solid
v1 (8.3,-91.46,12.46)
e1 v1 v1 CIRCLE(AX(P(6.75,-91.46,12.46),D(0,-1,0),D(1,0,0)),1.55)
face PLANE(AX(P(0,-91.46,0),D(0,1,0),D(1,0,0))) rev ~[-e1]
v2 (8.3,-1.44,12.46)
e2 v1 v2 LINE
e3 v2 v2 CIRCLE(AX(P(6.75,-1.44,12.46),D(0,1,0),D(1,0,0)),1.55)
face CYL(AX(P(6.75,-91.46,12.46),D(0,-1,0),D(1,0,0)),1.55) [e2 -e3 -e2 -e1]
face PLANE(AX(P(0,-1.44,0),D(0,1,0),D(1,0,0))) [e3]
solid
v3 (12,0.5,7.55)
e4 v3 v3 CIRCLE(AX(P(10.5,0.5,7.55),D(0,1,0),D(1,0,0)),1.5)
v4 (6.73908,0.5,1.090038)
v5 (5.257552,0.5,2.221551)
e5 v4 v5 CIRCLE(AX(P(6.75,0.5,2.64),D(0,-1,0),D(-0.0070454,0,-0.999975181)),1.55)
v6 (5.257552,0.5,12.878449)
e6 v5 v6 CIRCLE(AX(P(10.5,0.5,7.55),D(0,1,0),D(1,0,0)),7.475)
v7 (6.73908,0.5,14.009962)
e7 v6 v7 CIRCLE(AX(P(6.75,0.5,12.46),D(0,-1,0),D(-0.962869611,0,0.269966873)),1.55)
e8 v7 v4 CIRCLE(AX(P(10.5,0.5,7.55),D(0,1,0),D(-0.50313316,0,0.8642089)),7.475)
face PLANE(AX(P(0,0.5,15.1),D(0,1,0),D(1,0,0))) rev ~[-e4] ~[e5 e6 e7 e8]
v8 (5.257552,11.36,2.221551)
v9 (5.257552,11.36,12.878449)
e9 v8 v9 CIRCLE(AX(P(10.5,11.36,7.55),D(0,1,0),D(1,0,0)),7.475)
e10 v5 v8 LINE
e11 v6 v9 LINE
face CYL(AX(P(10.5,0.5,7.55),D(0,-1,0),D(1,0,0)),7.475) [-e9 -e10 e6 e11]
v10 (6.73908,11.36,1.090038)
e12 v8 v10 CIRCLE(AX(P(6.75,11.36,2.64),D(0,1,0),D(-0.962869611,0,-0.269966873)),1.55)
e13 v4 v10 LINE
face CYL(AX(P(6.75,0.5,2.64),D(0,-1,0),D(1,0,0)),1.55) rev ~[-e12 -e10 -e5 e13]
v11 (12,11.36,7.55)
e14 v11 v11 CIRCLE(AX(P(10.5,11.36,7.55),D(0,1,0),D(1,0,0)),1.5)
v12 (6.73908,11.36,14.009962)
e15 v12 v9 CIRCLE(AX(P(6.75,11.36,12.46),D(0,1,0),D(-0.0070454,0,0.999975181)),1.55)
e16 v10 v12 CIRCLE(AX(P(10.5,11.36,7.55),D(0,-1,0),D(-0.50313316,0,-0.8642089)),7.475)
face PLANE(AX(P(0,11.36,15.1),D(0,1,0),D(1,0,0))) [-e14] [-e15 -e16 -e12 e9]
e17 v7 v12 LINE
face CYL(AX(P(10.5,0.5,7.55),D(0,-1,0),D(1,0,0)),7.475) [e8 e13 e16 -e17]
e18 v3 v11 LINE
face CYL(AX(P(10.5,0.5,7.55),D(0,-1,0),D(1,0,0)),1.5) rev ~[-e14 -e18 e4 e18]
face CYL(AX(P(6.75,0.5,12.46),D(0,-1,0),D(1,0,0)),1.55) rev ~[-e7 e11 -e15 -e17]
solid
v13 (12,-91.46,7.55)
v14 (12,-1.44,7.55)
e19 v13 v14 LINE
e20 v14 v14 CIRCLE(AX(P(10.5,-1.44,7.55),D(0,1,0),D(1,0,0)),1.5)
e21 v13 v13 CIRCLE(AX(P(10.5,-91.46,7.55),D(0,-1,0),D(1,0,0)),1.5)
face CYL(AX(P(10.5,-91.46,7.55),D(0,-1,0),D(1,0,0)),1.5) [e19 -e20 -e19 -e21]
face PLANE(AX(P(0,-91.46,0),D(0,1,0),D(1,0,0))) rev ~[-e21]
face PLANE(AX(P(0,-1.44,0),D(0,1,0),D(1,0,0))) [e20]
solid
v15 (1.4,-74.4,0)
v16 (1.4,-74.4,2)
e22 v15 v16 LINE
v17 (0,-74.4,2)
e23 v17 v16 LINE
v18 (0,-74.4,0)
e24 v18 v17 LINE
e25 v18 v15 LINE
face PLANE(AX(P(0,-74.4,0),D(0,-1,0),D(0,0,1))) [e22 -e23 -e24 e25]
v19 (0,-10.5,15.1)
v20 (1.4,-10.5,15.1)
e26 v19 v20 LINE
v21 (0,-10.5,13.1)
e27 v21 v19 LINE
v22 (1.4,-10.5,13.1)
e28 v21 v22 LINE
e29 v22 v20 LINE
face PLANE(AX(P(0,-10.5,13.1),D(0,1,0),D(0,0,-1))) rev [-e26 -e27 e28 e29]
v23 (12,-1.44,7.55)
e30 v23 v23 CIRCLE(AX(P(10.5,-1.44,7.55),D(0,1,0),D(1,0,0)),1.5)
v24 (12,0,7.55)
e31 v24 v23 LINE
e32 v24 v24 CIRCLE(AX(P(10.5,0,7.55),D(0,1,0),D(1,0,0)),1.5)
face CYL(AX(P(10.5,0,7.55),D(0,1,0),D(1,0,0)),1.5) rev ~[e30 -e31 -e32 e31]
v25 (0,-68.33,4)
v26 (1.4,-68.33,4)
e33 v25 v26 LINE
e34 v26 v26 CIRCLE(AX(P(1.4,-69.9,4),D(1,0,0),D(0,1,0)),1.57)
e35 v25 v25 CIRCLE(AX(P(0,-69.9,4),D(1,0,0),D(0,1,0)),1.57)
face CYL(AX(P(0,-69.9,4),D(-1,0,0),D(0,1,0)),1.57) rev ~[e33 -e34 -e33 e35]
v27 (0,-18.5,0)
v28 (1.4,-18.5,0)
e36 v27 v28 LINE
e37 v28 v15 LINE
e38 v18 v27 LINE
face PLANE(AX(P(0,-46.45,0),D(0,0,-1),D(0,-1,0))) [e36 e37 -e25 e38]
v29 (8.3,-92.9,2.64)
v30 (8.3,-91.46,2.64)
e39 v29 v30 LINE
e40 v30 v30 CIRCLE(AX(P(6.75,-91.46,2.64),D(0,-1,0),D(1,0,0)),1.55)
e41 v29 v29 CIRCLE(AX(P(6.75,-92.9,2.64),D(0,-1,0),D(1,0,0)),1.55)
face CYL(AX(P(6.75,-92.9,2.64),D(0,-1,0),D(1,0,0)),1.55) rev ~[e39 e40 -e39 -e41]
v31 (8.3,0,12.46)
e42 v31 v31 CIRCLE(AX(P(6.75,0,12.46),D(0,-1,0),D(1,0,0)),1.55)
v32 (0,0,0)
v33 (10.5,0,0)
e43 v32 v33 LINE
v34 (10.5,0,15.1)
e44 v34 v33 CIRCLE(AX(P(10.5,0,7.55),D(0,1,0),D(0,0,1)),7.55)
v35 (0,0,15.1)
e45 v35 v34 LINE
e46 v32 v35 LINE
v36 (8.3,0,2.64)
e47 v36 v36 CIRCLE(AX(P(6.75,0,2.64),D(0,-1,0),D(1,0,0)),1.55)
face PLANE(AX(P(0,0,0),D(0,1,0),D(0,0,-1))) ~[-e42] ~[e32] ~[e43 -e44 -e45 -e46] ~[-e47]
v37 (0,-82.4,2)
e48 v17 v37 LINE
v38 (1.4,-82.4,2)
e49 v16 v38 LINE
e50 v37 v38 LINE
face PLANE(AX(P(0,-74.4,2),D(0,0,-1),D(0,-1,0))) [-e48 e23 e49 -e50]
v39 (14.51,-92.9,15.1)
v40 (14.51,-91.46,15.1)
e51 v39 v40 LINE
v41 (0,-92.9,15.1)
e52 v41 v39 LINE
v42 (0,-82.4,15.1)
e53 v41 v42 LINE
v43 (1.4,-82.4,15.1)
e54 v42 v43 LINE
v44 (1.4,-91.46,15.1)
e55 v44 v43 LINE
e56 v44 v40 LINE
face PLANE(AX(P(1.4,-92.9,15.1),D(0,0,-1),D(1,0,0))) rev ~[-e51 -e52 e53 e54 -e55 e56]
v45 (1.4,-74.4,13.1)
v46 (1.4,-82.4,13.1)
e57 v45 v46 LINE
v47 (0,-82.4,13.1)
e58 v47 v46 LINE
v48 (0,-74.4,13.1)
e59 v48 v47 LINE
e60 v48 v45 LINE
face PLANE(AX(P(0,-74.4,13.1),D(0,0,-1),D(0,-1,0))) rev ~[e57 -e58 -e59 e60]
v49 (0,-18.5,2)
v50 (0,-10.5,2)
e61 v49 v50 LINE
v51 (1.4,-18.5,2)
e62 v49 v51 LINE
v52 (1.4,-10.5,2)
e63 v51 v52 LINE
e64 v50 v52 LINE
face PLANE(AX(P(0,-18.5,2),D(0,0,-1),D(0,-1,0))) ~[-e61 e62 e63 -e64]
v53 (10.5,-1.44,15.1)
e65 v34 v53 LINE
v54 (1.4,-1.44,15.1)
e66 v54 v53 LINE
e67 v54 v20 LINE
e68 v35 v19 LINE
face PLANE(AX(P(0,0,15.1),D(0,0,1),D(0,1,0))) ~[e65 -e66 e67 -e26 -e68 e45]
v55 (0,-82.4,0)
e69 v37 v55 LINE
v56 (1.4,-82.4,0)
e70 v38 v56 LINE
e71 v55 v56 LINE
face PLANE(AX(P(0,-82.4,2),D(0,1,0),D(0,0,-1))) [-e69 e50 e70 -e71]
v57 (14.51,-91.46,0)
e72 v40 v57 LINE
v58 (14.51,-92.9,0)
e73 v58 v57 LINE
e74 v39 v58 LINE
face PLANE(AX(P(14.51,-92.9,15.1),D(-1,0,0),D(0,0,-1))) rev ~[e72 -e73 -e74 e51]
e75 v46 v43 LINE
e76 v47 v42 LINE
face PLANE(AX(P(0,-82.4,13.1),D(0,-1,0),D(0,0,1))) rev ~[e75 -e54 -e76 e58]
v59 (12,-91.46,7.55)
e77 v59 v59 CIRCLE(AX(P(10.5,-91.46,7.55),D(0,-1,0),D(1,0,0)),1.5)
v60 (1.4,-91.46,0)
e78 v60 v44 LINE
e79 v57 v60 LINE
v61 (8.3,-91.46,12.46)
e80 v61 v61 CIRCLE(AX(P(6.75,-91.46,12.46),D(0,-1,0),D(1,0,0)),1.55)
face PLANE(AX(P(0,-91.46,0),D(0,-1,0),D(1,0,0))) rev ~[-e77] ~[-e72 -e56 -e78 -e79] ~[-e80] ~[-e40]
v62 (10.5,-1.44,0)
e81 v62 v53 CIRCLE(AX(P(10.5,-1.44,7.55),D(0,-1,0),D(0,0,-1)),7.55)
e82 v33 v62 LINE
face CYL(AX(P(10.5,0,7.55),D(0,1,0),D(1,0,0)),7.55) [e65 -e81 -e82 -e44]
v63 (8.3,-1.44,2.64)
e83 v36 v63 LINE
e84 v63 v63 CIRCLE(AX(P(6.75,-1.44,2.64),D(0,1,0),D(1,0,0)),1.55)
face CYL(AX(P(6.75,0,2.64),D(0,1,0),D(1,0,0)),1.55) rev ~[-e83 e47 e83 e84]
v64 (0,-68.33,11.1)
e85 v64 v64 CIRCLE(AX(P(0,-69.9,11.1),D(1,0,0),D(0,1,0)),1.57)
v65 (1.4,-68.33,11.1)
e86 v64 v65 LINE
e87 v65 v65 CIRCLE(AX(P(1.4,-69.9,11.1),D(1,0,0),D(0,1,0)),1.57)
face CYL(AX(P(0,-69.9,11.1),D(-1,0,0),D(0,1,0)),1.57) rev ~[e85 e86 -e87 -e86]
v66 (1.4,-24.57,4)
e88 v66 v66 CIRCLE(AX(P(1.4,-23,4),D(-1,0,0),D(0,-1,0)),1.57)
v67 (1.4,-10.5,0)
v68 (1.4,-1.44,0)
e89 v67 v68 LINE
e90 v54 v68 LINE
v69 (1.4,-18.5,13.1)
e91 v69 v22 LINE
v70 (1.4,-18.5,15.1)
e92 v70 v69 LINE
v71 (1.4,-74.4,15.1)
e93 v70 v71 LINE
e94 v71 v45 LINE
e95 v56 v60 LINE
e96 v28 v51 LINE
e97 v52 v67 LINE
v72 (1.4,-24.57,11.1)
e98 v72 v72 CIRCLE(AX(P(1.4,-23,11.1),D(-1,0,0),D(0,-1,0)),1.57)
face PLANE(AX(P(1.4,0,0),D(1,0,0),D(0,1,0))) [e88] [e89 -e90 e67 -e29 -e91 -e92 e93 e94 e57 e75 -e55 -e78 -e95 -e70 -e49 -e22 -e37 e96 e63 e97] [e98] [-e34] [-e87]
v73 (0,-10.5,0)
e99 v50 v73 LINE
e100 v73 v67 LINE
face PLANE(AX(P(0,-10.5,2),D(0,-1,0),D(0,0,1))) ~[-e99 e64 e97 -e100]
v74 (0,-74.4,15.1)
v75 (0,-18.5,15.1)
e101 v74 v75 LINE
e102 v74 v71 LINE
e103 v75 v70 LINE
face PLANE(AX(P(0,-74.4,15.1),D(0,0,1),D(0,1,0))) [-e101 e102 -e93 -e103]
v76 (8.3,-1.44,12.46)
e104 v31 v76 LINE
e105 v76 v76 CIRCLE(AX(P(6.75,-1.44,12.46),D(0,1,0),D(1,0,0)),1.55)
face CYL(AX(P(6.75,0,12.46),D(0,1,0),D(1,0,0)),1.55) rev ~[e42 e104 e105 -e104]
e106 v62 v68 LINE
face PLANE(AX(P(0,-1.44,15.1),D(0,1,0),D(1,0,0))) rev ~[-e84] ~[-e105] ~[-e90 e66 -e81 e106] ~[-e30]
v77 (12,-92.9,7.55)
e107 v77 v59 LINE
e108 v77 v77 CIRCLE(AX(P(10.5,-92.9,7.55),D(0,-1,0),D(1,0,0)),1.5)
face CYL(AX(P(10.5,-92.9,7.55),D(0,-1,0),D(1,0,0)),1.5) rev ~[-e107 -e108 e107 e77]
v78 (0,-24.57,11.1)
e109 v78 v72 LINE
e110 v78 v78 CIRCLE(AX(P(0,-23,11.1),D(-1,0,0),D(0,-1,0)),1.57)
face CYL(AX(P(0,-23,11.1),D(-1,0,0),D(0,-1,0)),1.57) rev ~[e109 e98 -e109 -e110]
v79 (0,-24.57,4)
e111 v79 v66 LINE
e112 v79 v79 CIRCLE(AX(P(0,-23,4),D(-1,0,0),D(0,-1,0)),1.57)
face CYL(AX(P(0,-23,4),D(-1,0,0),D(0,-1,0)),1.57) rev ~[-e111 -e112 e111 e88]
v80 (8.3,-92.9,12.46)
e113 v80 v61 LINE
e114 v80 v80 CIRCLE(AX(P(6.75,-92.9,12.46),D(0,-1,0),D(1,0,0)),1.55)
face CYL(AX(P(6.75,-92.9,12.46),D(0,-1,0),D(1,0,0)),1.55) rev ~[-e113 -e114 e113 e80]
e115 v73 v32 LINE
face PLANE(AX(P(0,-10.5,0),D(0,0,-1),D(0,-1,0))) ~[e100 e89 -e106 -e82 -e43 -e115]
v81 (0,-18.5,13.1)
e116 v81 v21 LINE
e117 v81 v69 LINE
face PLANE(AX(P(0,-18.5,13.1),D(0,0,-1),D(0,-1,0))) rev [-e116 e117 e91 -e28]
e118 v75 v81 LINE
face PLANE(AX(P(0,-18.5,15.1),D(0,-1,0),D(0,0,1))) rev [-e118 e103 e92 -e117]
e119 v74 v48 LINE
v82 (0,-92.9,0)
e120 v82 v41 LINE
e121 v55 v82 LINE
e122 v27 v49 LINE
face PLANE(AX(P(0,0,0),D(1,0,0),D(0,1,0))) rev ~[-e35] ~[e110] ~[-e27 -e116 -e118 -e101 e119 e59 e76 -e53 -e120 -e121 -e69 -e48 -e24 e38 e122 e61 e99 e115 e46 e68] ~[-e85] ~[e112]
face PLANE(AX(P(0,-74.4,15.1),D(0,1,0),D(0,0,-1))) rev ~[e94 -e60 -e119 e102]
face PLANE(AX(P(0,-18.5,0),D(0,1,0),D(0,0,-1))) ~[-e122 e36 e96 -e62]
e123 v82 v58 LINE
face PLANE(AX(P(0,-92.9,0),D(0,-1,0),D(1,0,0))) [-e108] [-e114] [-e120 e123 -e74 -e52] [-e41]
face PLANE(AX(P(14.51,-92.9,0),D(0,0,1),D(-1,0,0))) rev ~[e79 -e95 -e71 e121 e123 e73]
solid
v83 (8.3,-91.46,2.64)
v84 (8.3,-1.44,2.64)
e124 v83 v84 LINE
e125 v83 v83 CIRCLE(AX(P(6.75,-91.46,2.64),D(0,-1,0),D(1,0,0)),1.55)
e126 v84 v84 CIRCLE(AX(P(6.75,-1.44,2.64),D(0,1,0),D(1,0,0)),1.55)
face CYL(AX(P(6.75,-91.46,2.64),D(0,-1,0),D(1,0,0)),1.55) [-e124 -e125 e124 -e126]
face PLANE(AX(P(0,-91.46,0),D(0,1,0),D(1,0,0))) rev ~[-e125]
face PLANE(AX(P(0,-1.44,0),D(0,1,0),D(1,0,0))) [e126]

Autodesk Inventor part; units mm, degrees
ref_plane "YZ Plane" through (0, 0, 0) normal (1, 0, 0) x (0, 1, 0)
ref_plane "XZ Plane" through (0, 0, 0) normal (0, 1, 0) x (-1, 0, 0)
ref_plane "XY Plane" through (0, 0, 0) normal (0, 0, 1) x (1, 0, 0)
sketch "Skizze1" plane through (0, 0, 0) normal (1, 0, 0) x (0, 1, 0)
  line L0 (0, 0) -> (-92.9, 0)
  line L1 (-92.9, 0) -> (-92.9, 15.1)
  line L2 (-92.9, 15.1) -> (0, 15.1)
  line L3 (0, 15.1) -> (0, 0)
  line L4 (-46.45, 15.1) -> (-46.45, 0)
  circle A0 centre (-69.9, 11.1) radius 1.57
  circle A1 centre (-69.9, 4) radius 1.57
  line L5 (-82.4, 15.1) -> (-74.4, 15.1)
  line L6 (-74.4, 15.1) -> (-74.4, 13.1)
  line L7 (-74.4, 13.1) -> (-82.4, 13.1)
  line L8 (-82.4, 13.1) -> (-82.4, 15.1)
  line L9 (-82.4, 0) -> (-74.4, 0)
  line L10 (-74.4, 0) -> (-74.4, 2)
  line L11 (-74.4, 2) -> (-82.4, 2)
  line L12 (-82.4, 2) -> (-82.4, 0)
  dimension "d0" = 92.9
  dimension "d1" = 15.1
  dimension "d2" = 3.14
  dimension "d3" = 3.14
  dimension "d4" = 23
  dimension "d5" = 23
  dimension "d6" = 4
  dimension "d7" = 4
  dimension "d8" = 8
  dimension "d9" = 2
  dimension "d10" = 10.5
  dimension "d11" = 2
extrude "Extrusion1" add sketch "Skizze1" along normal blind 1.4 contours L0 L10 L11 L12 L1 L2 L8 L7 L6 L4
mirror "Spiegeln1" about plane through (0, -46.45, 0) normal (0, 1, 0) of "Extrusion1"
sketch "Skizze2" plane through (0, -92.9, 0) normal (0, -1, 0) x (1, 0, 0)
  line L0 (0, 15.1) -> (0, 0) projected
  line L1 (0, 0) -> (1.4, 0) projected
  line L2 (1.4, 15.1) -> (1.4, 0) projected
  line L3 (0, 15.1) -> (1.4, 15.1) projected
  circle A0 centre (10.5, 7.55) radius 1.5
  circle A1 centre (6.75, 12.46) radius 1.55
  circle A2 centre (6.75, 2.64) radius 1.55
  line L4 (1.4, 15.1) -> (1.4, 13.1) projected
  line L5 (1.4, 15.1) -> (14.51, 15.1)
  line L6 (14.51, 15.1) -> (14.51, 0)
  line L7 (14.51, 0) -> (1.4, 0)
  line L8 (1.4, 0) -> (1.4, 15.1)
  dimension "d14" = 3
  dimension "d15" = 10.5
  dimension "d16" = 3.1
  dimension "d17" = 3.1
  dimension "d18" = 6.75
  dimension "d19" = 6.75
  dimension "d20" = 2.64
  dimension "d21" = 2.64
  dimension "d22" = 13.11
extrude "Extrusion2" add sketch "Skizze2" against normal blind 1.44 contours L5 L6 L7 L2
sketch "Skizze3" plane through (0, 0, 15.1) normal (0, 1, 0) x (1, 0, 0)
  line L0 (0, 0) -> (0, 15.1) projected
  line L1 (0, 0) -> (1.4, 0) projected
  line L2 (1.4, 0) -> (1.4, 15.1) projected
  line L3 (0, 15.1) -> (1.4, 15.1) projected
  line L4 (14.51, 0) -> (14.51, 15.1) projected
  line L5 (14.51, 15.1) -> (1.4, 15.1) projected
  line L6 (1.4, 0) -> (1.4, 15.1) projected
  line L7 (1.4, 0) -> (14.51, 0) projected
  circle A0 centre (10.5, 7.55) radius 1.5 projected
  circle A1 centre (6.75, 2.64) radius 1.55 projected
  circle A2 centre (6.75, 12.46) radius 1.55 projected
  circle A3 centre (10.5, 7.55) radius 7.55
  point P0 (10.5, 15.1)
  point P1 (10.5, 0)
extrude "Extrusion3" add sketch "Skizze3" against normal blind 1.44 contours L2 L5 A3 A2 A1 L7 | A3 A1 A2 L4 | L4 A3
ref_plane "Arbeitsebene1" through (0, 0.5, 15.1) normal (0, 1, 0) x (1, 0, 0)
sketch "Skizze4" plane through (0, 0.5, 15.1) normal (0, 1, 0) x (1, 0, 0)
  circle A0 centre (10.5, 7.55) radius 1.5 projected
  circle A1 centre (6.75, 2.64) radius 1.55 projected
  circle A2 centre (6.75, 12.46) radius 1.55 projected
  line L0 (0, 0) -> (0, 15.1) projected
  line L1 (0, 0) -> (10.5, 0) projected
  arc A3 (10.5, 0) -> (10.5, 15.1) centre (10.5, 7.55) ccw projected
  line L2 (0, 15.1) -> (10.5, 15.1) projected
  circle A4 centre (10.5, 7.55) radius 1.5 projected
  circle A5 centre (10.5, 7.55) radius 7.475
  dimension "d28" = 14.95
extrude "Extrusion4" add sketch "Skizze4" along normal blind 10.86 contours A1 A5 A2
sketch "Skizze5" plane through (0, -91.46, 0) normal (0, 1, 0) x (1, 0, 0)
  line L0 (14.51, -15.1) -> (14.51, 0) projected
  line L1 (14.51, 0) -> (1.4, 0) projected
  line L2 (1.4, -15.1) -> (1.4, 0) projected
  line L3 (1.4, -15.1) -> (14.51, -15.1) projected
  circle A0 centre (10.5, -7.55) radius 1.5 projected
  circle A1 centre (6.75, -12.46) radius 1.55 projected
  circle A2 centre (6.75, -2.64) radius 1.55 projected
  point P0 (0, 0)
extrude "Extrusion5" add sketch "Skizze5" along normal up to surface (90.02 mm away) contours A0 | A1 | A2
ref_plane "Work Plane2" through (0, -10.5, 7.55) normal (0, 0, 1) x (1, 0, 0)
equation "\"d16\" = d17"
properties part number "00_Linear_Stepper_90mm"
